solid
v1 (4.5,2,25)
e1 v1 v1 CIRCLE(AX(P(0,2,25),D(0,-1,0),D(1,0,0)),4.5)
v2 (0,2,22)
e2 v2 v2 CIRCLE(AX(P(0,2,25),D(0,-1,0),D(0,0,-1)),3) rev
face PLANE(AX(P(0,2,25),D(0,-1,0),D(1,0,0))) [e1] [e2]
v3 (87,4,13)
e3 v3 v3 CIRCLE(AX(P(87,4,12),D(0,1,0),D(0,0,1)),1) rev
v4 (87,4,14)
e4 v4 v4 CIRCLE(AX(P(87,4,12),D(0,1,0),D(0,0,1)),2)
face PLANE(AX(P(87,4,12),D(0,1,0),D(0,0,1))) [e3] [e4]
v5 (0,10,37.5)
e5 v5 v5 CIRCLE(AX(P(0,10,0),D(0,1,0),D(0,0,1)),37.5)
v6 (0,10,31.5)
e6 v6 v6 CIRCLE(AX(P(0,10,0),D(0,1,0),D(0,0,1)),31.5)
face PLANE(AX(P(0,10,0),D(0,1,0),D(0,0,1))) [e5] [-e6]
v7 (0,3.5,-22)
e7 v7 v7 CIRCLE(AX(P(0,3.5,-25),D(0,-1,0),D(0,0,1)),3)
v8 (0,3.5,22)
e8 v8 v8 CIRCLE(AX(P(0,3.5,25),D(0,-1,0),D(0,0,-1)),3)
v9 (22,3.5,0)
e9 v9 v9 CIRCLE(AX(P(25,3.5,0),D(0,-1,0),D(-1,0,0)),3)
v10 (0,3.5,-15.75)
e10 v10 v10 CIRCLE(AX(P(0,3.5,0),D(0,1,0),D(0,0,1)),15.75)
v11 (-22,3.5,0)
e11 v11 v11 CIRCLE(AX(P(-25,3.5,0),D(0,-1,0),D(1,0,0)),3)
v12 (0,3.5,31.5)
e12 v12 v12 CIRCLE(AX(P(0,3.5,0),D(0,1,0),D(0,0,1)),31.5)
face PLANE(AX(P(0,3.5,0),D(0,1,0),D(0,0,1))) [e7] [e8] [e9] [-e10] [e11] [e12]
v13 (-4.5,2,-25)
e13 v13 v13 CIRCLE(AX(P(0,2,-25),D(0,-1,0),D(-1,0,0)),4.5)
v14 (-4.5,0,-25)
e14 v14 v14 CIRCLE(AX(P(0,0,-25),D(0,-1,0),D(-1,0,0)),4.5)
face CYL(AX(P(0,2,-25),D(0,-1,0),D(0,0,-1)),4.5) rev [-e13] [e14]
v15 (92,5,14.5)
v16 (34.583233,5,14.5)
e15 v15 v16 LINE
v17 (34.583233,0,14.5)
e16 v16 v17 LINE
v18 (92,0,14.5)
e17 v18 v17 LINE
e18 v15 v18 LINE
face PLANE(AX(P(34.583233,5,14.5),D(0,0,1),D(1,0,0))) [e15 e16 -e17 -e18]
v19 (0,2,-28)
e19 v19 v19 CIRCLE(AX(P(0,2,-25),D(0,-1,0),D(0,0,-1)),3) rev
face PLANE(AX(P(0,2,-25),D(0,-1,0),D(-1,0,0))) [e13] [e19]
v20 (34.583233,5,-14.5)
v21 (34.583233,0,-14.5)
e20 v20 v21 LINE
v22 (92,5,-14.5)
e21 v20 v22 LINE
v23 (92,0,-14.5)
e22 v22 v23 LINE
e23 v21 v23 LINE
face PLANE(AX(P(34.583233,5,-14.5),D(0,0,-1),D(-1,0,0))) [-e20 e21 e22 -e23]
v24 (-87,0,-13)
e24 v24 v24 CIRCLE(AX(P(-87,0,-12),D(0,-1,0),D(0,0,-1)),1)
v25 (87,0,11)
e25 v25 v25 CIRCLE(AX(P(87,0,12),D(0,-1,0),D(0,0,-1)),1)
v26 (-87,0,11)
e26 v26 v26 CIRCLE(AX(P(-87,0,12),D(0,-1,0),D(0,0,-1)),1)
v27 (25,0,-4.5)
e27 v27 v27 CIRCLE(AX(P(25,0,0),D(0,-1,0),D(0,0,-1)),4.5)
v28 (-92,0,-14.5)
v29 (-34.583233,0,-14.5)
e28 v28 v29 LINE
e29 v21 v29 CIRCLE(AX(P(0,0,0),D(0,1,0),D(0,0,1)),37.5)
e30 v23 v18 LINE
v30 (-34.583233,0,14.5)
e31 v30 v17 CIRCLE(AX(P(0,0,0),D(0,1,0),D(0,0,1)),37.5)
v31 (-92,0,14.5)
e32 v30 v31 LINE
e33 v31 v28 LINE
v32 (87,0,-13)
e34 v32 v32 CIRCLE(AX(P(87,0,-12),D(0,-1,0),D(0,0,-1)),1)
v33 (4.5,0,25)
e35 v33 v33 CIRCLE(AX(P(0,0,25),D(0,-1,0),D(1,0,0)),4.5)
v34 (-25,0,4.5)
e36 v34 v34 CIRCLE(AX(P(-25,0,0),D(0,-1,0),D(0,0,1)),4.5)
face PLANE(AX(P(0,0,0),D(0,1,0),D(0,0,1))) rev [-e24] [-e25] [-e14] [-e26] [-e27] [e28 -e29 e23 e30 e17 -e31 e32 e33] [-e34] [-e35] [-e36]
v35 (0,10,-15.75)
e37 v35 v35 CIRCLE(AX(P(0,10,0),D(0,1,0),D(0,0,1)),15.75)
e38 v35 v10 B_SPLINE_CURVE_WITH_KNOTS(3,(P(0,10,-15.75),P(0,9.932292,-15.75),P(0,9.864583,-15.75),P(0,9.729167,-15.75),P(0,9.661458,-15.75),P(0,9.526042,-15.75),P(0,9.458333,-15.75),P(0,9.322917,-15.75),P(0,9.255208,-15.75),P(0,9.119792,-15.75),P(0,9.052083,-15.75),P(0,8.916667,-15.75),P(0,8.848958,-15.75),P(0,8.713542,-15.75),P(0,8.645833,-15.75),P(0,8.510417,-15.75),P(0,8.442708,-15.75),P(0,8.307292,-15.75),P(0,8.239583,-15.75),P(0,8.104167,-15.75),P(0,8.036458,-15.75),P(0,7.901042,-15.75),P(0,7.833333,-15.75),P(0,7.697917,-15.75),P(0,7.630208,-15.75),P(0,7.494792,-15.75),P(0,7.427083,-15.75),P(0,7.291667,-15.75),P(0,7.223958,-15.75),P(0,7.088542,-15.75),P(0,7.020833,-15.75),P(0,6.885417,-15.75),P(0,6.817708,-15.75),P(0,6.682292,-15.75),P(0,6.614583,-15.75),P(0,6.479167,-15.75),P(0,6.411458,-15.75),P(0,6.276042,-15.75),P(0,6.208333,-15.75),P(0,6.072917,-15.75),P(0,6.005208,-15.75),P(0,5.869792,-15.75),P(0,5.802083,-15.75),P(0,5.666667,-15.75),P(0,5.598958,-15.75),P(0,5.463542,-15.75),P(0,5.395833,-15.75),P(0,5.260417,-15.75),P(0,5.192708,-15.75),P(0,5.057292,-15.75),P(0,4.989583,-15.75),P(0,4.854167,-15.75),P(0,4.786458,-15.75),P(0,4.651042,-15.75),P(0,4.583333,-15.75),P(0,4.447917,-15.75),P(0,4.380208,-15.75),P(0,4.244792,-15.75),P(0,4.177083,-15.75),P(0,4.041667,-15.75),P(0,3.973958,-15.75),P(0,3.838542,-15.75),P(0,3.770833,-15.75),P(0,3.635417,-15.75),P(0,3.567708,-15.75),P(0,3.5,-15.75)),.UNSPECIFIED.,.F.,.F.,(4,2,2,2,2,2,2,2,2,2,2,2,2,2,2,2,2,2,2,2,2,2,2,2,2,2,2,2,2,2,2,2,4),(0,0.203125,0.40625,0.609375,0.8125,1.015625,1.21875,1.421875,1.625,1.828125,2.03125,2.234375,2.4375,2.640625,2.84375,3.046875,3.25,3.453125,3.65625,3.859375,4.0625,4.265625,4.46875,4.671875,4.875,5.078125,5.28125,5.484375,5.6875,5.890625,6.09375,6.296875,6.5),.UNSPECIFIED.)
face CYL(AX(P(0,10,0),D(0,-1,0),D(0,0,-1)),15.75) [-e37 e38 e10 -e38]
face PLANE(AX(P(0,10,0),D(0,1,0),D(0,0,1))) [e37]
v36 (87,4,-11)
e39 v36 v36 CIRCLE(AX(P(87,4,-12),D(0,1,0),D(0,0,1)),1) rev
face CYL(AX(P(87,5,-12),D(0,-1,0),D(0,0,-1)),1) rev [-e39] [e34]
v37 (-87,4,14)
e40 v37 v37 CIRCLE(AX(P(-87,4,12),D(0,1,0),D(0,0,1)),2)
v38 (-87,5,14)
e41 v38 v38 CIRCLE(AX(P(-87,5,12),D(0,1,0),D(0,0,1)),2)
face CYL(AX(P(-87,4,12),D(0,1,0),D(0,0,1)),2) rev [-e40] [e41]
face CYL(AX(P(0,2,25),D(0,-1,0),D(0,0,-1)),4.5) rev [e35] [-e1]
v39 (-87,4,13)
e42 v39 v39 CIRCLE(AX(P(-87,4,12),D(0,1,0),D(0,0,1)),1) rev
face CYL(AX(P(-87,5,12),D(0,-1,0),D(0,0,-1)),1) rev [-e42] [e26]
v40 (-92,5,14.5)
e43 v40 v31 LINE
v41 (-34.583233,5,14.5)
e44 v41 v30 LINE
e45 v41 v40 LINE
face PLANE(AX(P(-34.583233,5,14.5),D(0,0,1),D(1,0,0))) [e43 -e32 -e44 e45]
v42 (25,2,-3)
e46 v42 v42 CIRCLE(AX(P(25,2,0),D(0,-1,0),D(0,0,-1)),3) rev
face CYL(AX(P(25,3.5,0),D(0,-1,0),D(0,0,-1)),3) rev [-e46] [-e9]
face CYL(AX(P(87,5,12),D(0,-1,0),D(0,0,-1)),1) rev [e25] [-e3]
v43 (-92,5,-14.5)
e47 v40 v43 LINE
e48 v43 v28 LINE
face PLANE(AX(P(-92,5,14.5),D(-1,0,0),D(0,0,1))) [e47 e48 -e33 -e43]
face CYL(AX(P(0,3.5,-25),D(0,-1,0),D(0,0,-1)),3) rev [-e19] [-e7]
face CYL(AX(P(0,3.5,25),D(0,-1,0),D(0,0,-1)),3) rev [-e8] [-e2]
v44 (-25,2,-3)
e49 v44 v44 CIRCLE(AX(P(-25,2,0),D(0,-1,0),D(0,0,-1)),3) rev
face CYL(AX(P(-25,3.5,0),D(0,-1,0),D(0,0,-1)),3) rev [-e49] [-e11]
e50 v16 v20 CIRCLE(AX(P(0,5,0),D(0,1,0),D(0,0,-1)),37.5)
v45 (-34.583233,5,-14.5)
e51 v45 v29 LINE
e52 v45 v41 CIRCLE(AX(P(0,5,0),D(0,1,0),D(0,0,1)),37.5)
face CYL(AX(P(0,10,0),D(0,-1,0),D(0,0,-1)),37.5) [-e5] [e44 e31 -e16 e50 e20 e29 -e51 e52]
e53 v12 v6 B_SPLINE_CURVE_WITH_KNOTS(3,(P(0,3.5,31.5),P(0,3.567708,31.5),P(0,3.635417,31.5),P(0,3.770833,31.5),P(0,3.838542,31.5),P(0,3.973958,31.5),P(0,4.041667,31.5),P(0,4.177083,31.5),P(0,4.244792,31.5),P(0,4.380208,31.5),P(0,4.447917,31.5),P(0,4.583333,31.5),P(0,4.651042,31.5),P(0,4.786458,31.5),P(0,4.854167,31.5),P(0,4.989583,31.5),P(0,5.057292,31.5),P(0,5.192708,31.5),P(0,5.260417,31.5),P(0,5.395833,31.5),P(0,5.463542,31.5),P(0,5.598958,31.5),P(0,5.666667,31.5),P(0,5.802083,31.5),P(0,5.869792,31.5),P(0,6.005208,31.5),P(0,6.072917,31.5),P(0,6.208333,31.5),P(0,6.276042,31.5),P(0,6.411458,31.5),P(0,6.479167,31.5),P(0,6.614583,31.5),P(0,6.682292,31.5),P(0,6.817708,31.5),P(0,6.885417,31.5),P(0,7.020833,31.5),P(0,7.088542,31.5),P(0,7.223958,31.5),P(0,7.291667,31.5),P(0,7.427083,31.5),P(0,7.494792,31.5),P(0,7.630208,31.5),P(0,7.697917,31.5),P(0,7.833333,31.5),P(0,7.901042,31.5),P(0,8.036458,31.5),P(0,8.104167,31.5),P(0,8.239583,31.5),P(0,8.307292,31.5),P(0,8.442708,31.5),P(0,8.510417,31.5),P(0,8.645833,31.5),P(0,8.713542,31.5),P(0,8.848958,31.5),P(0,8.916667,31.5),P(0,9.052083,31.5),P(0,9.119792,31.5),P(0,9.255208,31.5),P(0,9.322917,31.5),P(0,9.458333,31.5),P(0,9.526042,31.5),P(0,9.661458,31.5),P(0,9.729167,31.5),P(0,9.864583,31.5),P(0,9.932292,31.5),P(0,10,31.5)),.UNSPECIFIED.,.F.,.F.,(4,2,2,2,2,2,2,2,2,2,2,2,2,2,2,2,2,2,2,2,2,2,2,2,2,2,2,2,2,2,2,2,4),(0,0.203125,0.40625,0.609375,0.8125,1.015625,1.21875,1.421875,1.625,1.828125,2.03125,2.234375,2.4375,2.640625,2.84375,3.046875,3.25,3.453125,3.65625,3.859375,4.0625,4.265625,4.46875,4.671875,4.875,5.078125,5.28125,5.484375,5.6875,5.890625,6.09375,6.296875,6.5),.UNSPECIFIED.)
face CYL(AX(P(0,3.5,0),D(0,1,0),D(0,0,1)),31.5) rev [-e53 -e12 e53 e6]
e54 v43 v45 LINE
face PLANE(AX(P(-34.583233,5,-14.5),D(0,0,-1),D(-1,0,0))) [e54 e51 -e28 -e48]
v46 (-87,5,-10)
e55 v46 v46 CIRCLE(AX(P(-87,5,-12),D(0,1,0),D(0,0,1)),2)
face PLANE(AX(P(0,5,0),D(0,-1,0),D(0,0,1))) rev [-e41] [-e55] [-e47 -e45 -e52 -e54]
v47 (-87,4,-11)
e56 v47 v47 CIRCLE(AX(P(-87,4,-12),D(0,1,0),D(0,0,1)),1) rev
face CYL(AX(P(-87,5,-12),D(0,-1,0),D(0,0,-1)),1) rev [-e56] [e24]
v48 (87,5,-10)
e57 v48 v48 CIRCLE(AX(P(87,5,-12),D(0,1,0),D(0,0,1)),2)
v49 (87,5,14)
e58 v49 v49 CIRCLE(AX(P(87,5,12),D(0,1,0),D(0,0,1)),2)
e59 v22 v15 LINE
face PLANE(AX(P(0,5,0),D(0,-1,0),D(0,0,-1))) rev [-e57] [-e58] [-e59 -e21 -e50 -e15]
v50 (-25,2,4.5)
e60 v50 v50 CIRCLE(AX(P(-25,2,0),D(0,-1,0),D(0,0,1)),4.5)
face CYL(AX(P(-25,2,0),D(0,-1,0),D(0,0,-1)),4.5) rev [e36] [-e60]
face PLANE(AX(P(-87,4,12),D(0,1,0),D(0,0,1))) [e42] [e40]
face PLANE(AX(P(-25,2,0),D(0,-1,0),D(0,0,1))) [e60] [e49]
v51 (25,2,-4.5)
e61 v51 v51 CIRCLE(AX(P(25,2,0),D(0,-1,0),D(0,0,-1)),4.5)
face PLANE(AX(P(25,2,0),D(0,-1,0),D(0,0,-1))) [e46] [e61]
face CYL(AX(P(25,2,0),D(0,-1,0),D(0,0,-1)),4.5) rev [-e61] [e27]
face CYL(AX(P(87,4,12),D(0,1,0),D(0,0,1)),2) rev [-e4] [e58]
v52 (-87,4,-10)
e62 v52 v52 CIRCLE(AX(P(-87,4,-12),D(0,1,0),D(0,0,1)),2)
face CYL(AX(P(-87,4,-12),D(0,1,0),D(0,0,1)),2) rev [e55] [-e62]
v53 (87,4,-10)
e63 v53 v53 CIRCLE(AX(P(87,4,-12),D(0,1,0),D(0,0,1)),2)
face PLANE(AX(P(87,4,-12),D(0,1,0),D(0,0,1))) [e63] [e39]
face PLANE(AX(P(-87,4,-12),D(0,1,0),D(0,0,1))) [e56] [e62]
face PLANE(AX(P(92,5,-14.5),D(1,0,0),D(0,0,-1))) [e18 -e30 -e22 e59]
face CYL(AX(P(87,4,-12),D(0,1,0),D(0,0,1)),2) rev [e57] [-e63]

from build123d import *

# Parameters (mm, degrees)
SKETCH1_R             = 37.5
BOSS_EXTRUDE1_DEPTH   = 10
SKETCH2_R             = 31.5
CUT_EXTRUDE1_DEPTH    = 6.5
SKETCH4_R             = 15.75
BOSS_EXTRUDE2_DEPTH   = 6.5
SKETCH5_R             = 3
CUT_EXTRUDE2_DEPTH    = 3.5
CIRPATTERN3_OUTLINE_R = 3
CIRPATTERN3_DEPTH     = 3.5
BOSS_EXTRUDE3_DEPTH   = 5
CIRPATTERN4_COUNT     = 4
SKETCH9_R             = 4.5
CUT_EXTRUDE3_DEPTH    = 2
CIRPATTERN5_COUNT     = 4
SKETCH10_R            = 1
CUT_EXTRUDE4_DEPTH    = 5
LPATTERN1_COUNT       = 2
LPATTERN1_PITCH       = 174
LPATTERN1_COUNT_DIR2  = 2
LPATTERN1_PITCH_DIR2  = 24
SKETCH11_R            = 2
CUT_EXTRUDE5_DEPTH    = 1
LPATTERN2_COUNT       = 2
LPATTERN2_PITCH       = 174
LPATTERN2_COUNT_DIR2  = 2
LPATTERN2_PITCH_DIR2  = 24


# Read off the part's stored shape, not the designer's step: CirPattern3
with BuildPart() as part:
    # Sketch1 → Boss-Extrude1 (new body)
    with BuildSketch(Plane(origin=(0, 0, 0), x_dir=(1, 0, 0), z_dir=(0, 1, 0))):
        with Locations(Location((0, 0, 0), (0, 0, 270))):
            Circle(SKETCH1_R)
    extrude(amount=BOSS_EXTRUDE1_DEPTH)

    # Sketch2 → Cut-Extrude1 (cut)
    with BuildSketch(Plane(origin=(0, 10, 0), x_dir=(1, 0, 0), z_dir=(0, 1, 0))):
        with Locations(Location((0, 0, 0), (0, 0, 270))):
            Circle(SKETCH2_R)
    extrude(amount=-CUT_EXTRUDE1_DEPTH, mode=Mode.SUBTRACT)

    # Sketch4 → Boss-Extrude2 (add)
    with BuildSketch(Plane(origin=(0, 3.5, 0), x_dir=(1, 0, 0), z_dir=(0, 1, 0))):
        with Locations(Location((0, 0, 0), (0, 0, 90))):
            Circle(SKETCH4_R)
    extrude(amount=BOSS_EXTRUDE2_DEPTH)

    # Sketch5 → Cut-Extrude2 (cut)
    with BuildSketch(Plane.XZ):
        with Locations(Location((0, 25, 0), (0, 0, 270))):
            Circle(SKETCH5_R)
    extrude(amount=-CUT_EXTRUDE2_DEPTH, mode=Mode.SUBTRACT)

    # CirPattern3 outline → CirPattern3 (cut)
    with BuildSketch(Plane(origin=(0, 0, 0), x_dir=(1, 0, 0), z_dir=(0, 1, 0))):
        with Locations((-25, 0)):
            Circle(CIRPATTERN3_OUTLINE_R)
        with Locations((0, 25)):
            Circle(CIRPATTERN3_OUTLINE_R)
        with Locations((25, 0)):
            Circle(CIRPATTERN3_OUTLINE_R)
    extrude(amount=CIRPATTERN3_DEPTH, mode=Mode.SUBTRACT)

    # Sketch7 → Boss-Extrude3 (add)
    with BuildSketch(Plane.XZ):
        with BuildLine():
            Line((34.583232932, 14.5), (92.000000002, 14.5))
            Line((92.000000002, 14.5), (92.000000002, -14.5))
            Line((92.000000002, -14.5), (34.583232932, -14.5))
            ThreePointArc((34.583232932, -14.5), (37.5, 0), (34.583232932, 14.5))
        make_face()
    boss_extrude3 = extrude(amount=-BOSS_EXTRUDE3_DEPTH)

    # CirPattern4: Boss-Extrude3 ×4 about axis, 2 skipped
    cirpattern4_axis = Axis((0, 0, 0), (0, 1, 0))
    add([boss_extrude3.rotate(cirpattern4_axis, i * 360 / CIRPATTERN4_COUNT) for i in range(1, CIRPATTERN4_COUNT) if i not in (1, 3)])

    # Sketch9 → Cut-Extrude3 (cut)
    with BuildSketch(Plane.XZ):
        with Locations(Location((25, 0, 0), (0, 0, 270))):
            Circle(SKETCH9_R)
    cut_extrude3 = extrude(amount=-CUT_EXTRUDE3_DEPTH, mode=Mode.SUBTRACT)

    # CirPattern5: Cut-Extrude3 ×4 about axis
    cirpattern5_axis = Axis((0, 0, 0), (0, 1, 0))
    for i in range(1, CIRPATTERN5_COUNT):
        add(cut_extrude3.rotate(cirpattern5_axis, i * 360 / CIRPATTERN5_COUNT), mode=Mode.SUBTRACT)

    # Sketch10 → Cut-Extrude4 (cut)
    with BuildSketch(Plane(origin=(0, 0, 0), x_dir=(-1, 0, 0), z_dir=(0, -1, 0))):
        with Locations(Location((-87, -12, 0), (0, 0, 90))):
            Circle(SKETCH10_R)
    cut_extrude4 = extrude(amount=-CUT_EXTRUDE4_DEPTH, mode=Mode.SUBTRACT)

    # LPattern1: Cut-Extrude4 2 × 2
    with Locations(*[(-i * LPATTERN1_PITCH, 0, -j * LPATTERN1_PITCH_DIR2) for i in range(LPATTERN1_COUNT) for j in range(LPATTERN1_COUNT_DIR2) if (i, j) != (0, 0)]):
        add(cut_extrude4, mode=Mode.SUBTRACT)

    # Sketch11 → Cut-Extrude5 (cut)
    with BuildSketch(Plane(origin=(0, 5, 0), x_dir=(1, 0, 0), z_dir=(0, 1, 0))):
        with Locations(Location((87, -12, 0), (0, 0, 270))):
            Circle(SKETCH11_R)
    cut_extrude5 = extrude(amount=-CUT_EXTRUDE5_DEPTH, mode=Mode.SUBTRACT)

    # LPattern2: Cut-Extrude5 2 × 2
    with Locations(*[(-i * LPATTERN2_PITCH, 0, -j * LPATTERN2_PITCH_DIR2) for i in range(LPATTERN2_COUNT) for j in range(LPATTERN2_COUNT_DIR2) if (i, j) != (0, 0)]):
        add(cut_extrude5, mode=Mode.SUBTRACT)


solid = part.part
